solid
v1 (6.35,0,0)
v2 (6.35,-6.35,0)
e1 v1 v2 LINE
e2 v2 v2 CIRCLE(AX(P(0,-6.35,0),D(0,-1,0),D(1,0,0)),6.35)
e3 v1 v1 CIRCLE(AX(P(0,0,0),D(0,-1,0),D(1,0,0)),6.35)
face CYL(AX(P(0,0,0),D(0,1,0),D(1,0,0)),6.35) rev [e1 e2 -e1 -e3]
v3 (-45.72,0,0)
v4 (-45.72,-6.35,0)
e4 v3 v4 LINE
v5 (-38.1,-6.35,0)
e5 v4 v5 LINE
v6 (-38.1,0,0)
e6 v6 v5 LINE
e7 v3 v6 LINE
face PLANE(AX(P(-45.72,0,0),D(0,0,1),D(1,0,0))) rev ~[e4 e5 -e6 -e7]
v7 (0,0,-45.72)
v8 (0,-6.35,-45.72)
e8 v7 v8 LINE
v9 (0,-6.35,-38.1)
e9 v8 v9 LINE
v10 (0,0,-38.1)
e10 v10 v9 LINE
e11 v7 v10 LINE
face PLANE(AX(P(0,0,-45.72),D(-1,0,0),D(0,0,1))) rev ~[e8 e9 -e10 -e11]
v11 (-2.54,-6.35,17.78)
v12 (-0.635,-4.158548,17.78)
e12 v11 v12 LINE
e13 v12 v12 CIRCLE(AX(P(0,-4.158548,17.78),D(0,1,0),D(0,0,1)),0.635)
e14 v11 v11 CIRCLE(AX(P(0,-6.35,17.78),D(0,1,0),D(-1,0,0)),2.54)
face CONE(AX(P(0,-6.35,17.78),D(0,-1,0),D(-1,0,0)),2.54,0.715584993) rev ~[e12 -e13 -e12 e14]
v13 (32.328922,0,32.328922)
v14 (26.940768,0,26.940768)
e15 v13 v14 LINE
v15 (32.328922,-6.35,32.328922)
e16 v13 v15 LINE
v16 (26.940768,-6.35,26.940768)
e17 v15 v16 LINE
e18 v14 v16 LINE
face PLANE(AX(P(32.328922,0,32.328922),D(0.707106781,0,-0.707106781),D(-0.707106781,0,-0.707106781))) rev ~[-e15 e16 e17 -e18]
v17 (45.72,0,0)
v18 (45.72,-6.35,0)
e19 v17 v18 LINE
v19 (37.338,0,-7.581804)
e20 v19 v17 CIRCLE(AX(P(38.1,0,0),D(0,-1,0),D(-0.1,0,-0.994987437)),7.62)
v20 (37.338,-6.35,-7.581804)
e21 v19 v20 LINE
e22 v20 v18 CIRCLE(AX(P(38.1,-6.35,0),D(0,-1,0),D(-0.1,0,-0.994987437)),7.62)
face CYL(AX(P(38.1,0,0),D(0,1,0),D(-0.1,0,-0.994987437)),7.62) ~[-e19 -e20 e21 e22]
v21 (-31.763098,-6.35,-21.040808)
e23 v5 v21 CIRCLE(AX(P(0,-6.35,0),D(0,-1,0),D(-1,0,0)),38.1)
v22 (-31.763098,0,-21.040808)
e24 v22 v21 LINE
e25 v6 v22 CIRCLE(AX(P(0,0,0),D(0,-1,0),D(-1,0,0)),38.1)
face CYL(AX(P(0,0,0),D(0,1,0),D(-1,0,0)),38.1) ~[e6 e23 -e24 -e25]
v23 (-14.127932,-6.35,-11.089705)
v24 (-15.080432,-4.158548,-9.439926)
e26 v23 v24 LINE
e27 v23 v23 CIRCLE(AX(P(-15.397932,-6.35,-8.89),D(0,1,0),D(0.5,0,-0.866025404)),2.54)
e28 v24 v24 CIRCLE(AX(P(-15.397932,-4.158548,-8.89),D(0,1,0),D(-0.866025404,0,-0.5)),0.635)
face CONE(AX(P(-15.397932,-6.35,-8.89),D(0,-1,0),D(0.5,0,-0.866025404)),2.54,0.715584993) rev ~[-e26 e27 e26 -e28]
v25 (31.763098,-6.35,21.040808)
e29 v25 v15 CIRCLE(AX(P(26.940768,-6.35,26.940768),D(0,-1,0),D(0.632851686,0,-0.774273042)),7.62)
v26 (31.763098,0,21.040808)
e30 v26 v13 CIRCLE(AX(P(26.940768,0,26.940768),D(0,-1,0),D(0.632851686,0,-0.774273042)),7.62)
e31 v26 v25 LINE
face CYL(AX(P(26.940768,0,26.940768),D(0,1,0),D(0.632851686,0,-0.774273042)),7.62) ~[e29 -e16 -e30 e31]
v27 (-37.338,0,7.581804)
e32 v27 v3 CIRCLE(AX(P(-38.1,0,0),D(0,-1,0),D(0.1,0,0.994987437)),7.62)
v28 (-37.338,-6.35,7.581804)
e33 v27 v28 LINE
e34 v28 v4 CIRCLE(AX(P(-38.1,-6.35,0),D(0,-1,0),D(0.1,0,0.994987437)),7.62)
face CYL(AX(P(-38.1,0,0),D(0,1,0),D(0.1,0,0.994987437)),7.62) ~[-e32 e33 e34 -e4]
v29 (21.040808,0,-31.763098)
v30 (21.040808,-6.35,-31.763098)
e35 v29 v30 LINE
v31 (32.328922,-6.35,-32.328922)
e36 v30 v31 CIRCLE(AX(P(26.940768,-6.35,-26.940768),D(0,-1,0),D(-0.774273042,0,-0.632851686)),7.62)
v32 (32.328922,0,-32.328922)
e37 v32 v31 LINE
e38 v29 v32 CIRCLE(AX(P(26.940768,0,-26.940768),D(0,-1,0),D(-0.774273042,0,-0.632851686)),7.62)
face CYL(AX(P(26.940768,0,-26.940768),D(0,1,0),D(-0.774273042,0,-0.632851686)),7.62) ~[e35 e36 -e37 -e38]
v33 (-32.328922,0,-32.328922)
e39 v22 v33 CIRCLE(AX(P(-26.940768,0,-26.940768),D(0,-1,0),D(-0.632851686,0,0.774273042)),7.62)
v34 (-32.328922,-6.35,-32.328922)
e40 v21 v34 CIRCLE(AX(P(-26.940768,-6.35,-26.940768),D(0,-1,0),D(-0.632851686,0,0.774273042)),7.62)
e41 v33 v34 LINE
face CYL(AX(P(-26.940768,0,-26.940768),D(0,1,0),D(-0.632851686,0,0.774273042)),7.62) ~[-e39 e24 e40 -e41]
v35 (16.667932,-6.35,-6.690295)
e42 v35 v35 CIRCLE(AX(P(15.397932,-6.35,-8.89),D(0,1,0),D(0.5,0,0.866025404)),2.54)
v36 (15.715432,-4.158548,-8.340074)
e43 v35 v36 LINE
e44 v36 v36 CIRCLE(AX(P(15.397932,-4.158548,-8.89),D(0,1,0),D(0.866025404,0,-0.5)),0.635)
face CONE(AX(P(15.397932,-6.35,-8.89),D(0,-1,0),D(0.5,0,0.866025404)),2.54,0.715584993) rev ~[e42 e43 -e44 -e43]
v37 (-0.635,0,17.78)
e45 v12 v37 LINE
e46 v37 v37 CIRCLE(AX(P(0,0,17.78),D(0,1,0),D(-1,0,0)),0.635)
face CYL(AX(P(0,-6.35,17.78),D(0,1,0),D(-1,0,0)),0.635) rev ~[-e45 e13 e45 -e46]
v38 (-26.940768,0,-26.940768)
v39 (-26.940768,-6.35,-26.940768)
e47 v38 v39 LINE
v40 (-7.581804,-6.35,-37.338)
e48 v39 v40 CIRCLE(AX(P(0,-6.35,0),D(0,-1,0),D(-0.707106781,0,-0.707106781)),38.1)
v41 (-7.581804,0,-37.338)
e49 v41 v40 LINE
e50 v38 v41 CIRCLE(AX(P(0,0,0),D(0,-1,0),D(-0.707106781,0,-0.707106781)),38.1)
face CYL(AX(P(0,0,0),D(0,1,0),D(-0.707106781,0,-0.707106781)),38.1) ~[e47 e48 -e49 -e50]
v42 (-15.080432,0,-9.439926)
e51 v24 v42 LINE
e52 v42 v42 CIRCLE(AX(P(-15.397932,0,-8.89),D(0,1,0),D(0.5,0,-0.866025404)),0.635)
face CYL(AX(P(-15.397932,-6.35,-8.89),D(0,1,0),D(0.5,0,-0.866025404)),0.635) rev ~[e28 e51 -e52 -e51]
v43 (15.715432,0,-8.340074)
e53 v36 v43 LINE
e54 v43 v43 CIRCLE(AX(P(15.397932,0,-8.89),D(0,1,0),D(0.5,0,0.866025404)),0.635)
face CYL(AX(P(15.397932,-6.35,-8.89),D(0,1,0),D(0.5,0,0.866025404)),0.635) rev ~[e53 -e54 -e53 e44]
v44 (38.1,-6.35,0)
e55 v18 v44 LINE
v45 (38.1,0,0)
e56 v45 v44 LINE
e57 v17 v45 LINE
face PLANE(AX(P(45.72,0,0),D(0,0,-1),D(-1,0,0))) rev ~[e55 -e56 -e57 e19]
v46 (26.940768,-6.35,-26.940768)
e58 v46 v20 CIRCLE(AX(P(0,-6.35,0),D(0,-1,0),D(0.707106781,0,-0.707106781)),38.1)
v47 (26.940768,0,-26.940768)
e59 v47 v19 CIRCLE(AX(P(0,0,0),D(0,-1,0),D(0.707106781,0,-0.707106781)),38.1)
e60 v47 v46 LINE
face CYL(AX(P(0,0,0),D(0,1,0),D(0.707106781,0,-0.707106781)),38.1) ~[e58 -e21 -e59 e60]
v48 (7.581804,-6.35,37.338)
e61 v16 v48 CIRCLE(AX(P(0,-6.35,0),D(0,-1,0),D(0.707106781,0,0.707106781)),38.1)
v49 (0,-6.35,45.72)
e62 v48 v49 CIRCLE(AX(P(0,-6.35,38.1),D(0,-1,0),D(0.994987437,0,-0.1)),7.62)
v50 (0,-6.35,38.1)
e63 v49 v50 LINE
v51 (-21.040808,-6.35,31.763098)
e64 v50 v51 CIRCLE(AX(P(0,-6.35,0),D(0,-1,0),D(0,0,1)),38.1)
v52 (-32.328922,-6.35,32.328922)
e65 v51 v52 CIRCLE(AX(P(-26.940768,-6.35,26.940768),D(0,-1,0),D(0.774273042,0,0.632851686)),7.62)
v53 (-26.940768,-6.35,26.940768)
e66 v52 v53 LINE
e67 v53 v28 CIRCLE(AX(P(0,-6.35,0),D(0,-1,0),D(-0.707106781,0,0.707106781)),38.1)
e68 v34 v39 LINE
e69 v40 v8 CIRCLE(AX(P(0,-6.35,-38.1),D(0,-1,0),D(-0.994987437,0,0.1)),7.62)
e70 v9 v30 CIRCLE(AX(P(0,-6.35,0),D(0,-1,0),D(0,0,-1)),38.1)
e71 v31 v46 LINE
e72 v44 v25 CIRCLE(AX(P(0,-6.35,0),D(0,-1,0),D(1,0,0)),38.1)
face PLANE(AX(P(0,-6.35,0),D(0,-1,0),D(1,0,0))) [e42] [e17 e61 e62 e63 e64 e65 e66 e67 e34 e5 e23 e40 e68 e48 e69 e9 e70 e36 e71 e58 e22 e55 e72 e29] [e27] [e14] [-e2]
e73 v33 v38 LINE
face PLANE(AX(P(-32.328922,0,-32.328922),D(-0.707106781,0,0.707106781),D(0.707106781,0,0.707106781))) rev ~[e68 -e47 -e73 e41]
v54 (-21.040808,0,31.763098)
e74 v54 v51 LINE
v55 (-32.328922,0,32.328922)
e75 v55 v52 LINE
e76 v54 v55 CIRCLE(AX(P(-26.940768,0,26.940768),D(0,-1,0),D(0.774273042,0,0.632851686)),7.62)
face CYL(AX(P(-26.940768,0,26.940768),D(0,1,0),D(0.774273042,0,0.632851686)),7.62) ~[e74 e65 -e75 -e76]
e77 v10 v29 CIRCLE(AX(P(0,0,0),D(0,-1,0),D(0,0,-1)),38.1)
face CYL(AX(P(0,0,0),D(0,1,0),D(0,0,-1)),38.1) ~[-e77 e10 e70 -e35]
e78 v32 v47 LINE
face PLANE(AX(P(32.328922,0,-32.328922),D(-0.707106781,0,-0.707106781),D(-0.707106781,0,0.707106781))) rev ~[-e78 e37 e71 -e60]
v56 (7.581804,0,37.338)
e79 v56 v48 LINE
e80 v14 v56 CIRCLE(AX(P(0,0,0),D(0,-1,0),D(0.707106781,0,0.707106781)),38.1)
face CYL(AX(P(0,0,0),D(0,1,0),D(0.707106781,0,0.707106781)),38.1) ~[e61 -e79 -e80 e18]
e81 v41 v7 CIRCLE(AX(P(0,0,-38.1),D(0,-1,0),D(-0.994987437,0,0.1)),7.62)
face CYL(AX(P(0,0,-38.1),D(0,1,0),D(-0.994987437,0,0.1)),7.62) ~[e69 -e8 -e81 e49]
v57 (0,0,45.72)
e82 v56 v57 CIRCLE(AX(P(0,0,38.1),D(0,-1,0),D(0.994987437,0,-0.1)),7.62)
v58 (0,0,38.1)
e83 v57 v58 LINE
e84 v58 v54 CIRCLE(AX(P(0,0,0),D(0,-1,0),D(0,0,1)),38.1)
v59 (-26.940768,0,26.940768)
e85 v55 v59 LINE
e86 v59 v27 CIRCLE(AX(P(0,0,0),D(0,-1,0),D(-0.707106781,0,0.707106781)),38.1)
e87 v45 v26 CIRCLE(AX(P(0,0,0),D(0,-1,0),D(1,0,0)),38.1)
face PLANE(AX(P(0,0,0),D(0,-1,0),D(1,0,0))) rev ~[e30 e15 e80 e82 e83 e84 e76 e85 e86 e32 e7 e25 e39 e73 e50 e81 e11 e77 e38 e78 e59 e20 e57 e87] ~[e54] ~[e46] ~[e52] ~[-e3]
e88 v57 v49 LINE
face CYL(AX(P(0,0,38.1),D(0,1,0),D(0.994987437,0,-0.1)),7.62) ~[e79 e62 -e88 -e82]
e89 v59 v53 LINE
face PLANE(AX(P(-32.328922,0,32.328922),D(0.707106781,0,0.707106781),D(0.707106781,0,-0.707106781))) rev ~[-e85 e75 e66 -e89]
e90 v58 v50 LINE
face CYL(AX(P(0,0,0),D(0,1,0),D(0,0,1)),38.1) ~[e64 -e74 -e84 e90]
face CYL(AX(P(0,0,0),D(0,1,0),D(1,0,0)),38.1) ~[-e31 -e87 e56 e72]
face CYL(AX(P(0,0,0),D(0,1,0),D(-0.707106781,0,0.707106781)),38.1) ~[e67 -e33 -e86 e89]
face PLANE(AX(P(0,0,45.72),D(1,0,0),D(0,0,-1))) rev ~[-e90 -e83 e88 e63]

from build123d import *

# Parameters (mm, degrees)
F0_R            = 6.35
F1_DEPTH        = 6.35
F3_D            = 1.27
F3_DEPTH        = 6.35
F3_CSINK_D      = 5.08
F3_CSINK_ANGLE  = 82
F3_TIP          = 0.3815464931
F3_COPIES_COUNT = 3


# Not quite as in the source:
# - a pattern or mirror of a feature is missing from the dataset's text; its kind, count and spacing are read off the source's solid


with BuildPart() as f1:
    # F0 (on Front) → F1 (new body)
    with BuildSketch(Plane.XZ):
        with BuildLine():
            ThreePointArc((37.338, -7.5818042708), (37.9090213538, -3.81), (38.1, 0))
            ThreePointArc((38.1, 0), (36.4813928036, 10.9871733904), (31.7630982094, 21.0408077825))
            ThreePointArc((31.7630982094, 21.0408077825), (29.4998029037, 24.1116492311), (26.9407683632, 26.9407683632))
            ThreePointArc((26.9407683632, 26.9407683632), (18.0271354281, 33.565345049), (7.5818042708, 37.338))
            ThreePointArc((7.5818042708, 37.338), (3.81, 37.9090213538), (0, 38.1))
            ThreePointArc((0, 38.1), (-10.9871733904, 36.4813928036), (-21.0408077825, 31.7630982094))
            ThreePointArc((-21.0408077825, 31.7630982094), (-24.1116492311, 29.4998029037), (-26.9407683632, 26.9407683632))
            ThreePointArc((-26.9407683632, 26.9407683632), (-33.565345049, 18.0271354281), (-37.338, 7.5818042708))
            ThreePointArc((-37.338, 7.5818042708), (-37.9090213538, 3.81), (-38.1, 0))
            ThreePointArc((-38.1, 0), (-36.4813928036, -10.9871733904), (-31.7630982094, -21.0408077825))
            ThreePointArc((-31.7630982094, -21.0408077825), (-29.4998029037, -24.1116492311), (-26.9407683632, -26.9407683632))
            ThreePointArc((-26.9407683632, -26.9407683632), (-18.0271354281, -33.565345049), (-7.5818042708, -37.338))
            ThreePointArc((-7.5818042708, -37.338), (-3.81, -37.9090213538), (0, -38.1))
            ThreePointArc((0, -38.1), (10.9871733904, -36.4813928036), (21.0408077825, -31.7630982094))
            ThreePointArc((21.0408077825, -31.7630982094), (24.1116492311, -29.4998029037), (26.9407683632, -26.9407683632))
            ThreePointArc((26.9407683632, -26.9407683632), (33.565345049, -18.0271354281), (37.338, -7.5818042708))
        make_face()
        Circle(F0_R, mode=Mode.SUBTRACT)
        with BuildLine():
            ThreePointArc((-26.9407683632, 26.9407683632), (-24.1116492311, 29.4998029037), (-21.0408077825, 31.7630982094))
            ThreePointArc((-21.0408077825, 31.7630982094), (-26.5592900173, 34.5512134403), (-32.3289220358, 32.3289220358))
            Line((-32.3289220358, 32.3289220358), (-26.9407683632, 26.9407683632))
        make_face()
        with BuildLine():
            ThreePointArc((0, 38.1), (3.81, 37.9090213538), (7.5818042708, 37.338))
            ThreePointArc((7.5818042708, 37.338), (5.6511432472, 43.2116513966), (0, 45.72))
            Line((0, 45.72), (0, 38.1))
        make_face()
        with BuildLine():
            ThreePointArc((26.9407683632, 26.9407683632), (29.4998029037, 24.1116492311), (31.7630982094, 21.0408077825))
            ThreePointArc((31.7630982094, 21.0408077825), (34.5512134403, 26.5592900173), (32.3289220358, 32.3289220358))
            Line((32.3289220358, 32.3289220358), (26.9407683632, 26.9407683632))
        make_face()
        with BuildLine():
            Line((45.72, 0), (38.1, 0))
            ThreePointArc((38.1, 0), (37.9090213538, -3.81), (37.338, -7.5818042708))
            ThreePointArc((37.338, -7.5818042708), (43.2116513966, -5.6511432472), (45.72, 0))
        make_face()
        with BuildLine():
            Line((32.3289220358, -32.3289220358), (26.9407683632, -26.9407683632))
            ThreePointArc((26.9407683632, -26.9407683632), (24.1116492311, -29.4998029037), (21.0408077825, -31.7630982094))
            ThreePointArc((21.0408077825, -31.7630982094), (26.5592900173, -34.5512134403), (32.3289220358, -32.3289220358))
        make_face()
        with BuildLine():
            Line((0, -45.72), (0, -38.1))
            ThreePointArc((0, -38.1), (-3.81, -37.9090213538), (-7.5818042708, -37.338))
            ThreePointArc((-7.5818042708, -37.338), (-5.6511432472, -43.2116513966), (0, -45.72))
        make_face()
        with BuildLine():
            Line((-32.3289220358, -32.3289220358), (-26.9407683632, -26.9407683632))
            ThreePointArc((-26.9407683632, -26.9407683632), (-29.4998029037, -24.1116492311), (-31.7630982094, -21.0408077825))
            ThreePointArc((-31.7630982094, -21.0408077825), (-34.5512134403, -26.5592900173), (-32.3289220358, -32.3289220358))
        make_face()
        with BuildLine():
            ThreePointArc((-38.1, 0), (-37.9090213538, 3.81), (-37.338, 7.5818042708))
            ThreePointArc((-37.338, 7.5818042708), (-43.2116513966, 5.6511432472), (-45.72, 0))
            Line((-45.72, 0), (-38.1, 0))
        make_face()
    extrude(amount=F1_DEPTH)

    # F3
    with Locations(Plane.XZ.offset(6.35)):
        with Locations((0, 17.78)):
            f3 = CounterSinkHole(F3_D / 2, F3_CSINK_D / 2, depth=F3_DEPTH, counter_sink_angle=F3_CSINK_ANGLE)
            with Locations((0, 0, -(F3_DEPTH + F3_TIP / 2))):  # 118° drill point
                Cone(0, F3_D / 2, F3_TIP, mode=Mode.SUBTRACT)

    # F3_copies: F3 ×3 about axis
    f3_copies_axis = Axis((0, 0, 0), (0, 1, 0))
    for i in range(1, F3_COPIES_COUNT):
        add(f3.rotate(f3_copies_axis, i * 360 / F3_COPIES_COUNT), mode=Mode.SUBTRACT)


solid = f1.part
